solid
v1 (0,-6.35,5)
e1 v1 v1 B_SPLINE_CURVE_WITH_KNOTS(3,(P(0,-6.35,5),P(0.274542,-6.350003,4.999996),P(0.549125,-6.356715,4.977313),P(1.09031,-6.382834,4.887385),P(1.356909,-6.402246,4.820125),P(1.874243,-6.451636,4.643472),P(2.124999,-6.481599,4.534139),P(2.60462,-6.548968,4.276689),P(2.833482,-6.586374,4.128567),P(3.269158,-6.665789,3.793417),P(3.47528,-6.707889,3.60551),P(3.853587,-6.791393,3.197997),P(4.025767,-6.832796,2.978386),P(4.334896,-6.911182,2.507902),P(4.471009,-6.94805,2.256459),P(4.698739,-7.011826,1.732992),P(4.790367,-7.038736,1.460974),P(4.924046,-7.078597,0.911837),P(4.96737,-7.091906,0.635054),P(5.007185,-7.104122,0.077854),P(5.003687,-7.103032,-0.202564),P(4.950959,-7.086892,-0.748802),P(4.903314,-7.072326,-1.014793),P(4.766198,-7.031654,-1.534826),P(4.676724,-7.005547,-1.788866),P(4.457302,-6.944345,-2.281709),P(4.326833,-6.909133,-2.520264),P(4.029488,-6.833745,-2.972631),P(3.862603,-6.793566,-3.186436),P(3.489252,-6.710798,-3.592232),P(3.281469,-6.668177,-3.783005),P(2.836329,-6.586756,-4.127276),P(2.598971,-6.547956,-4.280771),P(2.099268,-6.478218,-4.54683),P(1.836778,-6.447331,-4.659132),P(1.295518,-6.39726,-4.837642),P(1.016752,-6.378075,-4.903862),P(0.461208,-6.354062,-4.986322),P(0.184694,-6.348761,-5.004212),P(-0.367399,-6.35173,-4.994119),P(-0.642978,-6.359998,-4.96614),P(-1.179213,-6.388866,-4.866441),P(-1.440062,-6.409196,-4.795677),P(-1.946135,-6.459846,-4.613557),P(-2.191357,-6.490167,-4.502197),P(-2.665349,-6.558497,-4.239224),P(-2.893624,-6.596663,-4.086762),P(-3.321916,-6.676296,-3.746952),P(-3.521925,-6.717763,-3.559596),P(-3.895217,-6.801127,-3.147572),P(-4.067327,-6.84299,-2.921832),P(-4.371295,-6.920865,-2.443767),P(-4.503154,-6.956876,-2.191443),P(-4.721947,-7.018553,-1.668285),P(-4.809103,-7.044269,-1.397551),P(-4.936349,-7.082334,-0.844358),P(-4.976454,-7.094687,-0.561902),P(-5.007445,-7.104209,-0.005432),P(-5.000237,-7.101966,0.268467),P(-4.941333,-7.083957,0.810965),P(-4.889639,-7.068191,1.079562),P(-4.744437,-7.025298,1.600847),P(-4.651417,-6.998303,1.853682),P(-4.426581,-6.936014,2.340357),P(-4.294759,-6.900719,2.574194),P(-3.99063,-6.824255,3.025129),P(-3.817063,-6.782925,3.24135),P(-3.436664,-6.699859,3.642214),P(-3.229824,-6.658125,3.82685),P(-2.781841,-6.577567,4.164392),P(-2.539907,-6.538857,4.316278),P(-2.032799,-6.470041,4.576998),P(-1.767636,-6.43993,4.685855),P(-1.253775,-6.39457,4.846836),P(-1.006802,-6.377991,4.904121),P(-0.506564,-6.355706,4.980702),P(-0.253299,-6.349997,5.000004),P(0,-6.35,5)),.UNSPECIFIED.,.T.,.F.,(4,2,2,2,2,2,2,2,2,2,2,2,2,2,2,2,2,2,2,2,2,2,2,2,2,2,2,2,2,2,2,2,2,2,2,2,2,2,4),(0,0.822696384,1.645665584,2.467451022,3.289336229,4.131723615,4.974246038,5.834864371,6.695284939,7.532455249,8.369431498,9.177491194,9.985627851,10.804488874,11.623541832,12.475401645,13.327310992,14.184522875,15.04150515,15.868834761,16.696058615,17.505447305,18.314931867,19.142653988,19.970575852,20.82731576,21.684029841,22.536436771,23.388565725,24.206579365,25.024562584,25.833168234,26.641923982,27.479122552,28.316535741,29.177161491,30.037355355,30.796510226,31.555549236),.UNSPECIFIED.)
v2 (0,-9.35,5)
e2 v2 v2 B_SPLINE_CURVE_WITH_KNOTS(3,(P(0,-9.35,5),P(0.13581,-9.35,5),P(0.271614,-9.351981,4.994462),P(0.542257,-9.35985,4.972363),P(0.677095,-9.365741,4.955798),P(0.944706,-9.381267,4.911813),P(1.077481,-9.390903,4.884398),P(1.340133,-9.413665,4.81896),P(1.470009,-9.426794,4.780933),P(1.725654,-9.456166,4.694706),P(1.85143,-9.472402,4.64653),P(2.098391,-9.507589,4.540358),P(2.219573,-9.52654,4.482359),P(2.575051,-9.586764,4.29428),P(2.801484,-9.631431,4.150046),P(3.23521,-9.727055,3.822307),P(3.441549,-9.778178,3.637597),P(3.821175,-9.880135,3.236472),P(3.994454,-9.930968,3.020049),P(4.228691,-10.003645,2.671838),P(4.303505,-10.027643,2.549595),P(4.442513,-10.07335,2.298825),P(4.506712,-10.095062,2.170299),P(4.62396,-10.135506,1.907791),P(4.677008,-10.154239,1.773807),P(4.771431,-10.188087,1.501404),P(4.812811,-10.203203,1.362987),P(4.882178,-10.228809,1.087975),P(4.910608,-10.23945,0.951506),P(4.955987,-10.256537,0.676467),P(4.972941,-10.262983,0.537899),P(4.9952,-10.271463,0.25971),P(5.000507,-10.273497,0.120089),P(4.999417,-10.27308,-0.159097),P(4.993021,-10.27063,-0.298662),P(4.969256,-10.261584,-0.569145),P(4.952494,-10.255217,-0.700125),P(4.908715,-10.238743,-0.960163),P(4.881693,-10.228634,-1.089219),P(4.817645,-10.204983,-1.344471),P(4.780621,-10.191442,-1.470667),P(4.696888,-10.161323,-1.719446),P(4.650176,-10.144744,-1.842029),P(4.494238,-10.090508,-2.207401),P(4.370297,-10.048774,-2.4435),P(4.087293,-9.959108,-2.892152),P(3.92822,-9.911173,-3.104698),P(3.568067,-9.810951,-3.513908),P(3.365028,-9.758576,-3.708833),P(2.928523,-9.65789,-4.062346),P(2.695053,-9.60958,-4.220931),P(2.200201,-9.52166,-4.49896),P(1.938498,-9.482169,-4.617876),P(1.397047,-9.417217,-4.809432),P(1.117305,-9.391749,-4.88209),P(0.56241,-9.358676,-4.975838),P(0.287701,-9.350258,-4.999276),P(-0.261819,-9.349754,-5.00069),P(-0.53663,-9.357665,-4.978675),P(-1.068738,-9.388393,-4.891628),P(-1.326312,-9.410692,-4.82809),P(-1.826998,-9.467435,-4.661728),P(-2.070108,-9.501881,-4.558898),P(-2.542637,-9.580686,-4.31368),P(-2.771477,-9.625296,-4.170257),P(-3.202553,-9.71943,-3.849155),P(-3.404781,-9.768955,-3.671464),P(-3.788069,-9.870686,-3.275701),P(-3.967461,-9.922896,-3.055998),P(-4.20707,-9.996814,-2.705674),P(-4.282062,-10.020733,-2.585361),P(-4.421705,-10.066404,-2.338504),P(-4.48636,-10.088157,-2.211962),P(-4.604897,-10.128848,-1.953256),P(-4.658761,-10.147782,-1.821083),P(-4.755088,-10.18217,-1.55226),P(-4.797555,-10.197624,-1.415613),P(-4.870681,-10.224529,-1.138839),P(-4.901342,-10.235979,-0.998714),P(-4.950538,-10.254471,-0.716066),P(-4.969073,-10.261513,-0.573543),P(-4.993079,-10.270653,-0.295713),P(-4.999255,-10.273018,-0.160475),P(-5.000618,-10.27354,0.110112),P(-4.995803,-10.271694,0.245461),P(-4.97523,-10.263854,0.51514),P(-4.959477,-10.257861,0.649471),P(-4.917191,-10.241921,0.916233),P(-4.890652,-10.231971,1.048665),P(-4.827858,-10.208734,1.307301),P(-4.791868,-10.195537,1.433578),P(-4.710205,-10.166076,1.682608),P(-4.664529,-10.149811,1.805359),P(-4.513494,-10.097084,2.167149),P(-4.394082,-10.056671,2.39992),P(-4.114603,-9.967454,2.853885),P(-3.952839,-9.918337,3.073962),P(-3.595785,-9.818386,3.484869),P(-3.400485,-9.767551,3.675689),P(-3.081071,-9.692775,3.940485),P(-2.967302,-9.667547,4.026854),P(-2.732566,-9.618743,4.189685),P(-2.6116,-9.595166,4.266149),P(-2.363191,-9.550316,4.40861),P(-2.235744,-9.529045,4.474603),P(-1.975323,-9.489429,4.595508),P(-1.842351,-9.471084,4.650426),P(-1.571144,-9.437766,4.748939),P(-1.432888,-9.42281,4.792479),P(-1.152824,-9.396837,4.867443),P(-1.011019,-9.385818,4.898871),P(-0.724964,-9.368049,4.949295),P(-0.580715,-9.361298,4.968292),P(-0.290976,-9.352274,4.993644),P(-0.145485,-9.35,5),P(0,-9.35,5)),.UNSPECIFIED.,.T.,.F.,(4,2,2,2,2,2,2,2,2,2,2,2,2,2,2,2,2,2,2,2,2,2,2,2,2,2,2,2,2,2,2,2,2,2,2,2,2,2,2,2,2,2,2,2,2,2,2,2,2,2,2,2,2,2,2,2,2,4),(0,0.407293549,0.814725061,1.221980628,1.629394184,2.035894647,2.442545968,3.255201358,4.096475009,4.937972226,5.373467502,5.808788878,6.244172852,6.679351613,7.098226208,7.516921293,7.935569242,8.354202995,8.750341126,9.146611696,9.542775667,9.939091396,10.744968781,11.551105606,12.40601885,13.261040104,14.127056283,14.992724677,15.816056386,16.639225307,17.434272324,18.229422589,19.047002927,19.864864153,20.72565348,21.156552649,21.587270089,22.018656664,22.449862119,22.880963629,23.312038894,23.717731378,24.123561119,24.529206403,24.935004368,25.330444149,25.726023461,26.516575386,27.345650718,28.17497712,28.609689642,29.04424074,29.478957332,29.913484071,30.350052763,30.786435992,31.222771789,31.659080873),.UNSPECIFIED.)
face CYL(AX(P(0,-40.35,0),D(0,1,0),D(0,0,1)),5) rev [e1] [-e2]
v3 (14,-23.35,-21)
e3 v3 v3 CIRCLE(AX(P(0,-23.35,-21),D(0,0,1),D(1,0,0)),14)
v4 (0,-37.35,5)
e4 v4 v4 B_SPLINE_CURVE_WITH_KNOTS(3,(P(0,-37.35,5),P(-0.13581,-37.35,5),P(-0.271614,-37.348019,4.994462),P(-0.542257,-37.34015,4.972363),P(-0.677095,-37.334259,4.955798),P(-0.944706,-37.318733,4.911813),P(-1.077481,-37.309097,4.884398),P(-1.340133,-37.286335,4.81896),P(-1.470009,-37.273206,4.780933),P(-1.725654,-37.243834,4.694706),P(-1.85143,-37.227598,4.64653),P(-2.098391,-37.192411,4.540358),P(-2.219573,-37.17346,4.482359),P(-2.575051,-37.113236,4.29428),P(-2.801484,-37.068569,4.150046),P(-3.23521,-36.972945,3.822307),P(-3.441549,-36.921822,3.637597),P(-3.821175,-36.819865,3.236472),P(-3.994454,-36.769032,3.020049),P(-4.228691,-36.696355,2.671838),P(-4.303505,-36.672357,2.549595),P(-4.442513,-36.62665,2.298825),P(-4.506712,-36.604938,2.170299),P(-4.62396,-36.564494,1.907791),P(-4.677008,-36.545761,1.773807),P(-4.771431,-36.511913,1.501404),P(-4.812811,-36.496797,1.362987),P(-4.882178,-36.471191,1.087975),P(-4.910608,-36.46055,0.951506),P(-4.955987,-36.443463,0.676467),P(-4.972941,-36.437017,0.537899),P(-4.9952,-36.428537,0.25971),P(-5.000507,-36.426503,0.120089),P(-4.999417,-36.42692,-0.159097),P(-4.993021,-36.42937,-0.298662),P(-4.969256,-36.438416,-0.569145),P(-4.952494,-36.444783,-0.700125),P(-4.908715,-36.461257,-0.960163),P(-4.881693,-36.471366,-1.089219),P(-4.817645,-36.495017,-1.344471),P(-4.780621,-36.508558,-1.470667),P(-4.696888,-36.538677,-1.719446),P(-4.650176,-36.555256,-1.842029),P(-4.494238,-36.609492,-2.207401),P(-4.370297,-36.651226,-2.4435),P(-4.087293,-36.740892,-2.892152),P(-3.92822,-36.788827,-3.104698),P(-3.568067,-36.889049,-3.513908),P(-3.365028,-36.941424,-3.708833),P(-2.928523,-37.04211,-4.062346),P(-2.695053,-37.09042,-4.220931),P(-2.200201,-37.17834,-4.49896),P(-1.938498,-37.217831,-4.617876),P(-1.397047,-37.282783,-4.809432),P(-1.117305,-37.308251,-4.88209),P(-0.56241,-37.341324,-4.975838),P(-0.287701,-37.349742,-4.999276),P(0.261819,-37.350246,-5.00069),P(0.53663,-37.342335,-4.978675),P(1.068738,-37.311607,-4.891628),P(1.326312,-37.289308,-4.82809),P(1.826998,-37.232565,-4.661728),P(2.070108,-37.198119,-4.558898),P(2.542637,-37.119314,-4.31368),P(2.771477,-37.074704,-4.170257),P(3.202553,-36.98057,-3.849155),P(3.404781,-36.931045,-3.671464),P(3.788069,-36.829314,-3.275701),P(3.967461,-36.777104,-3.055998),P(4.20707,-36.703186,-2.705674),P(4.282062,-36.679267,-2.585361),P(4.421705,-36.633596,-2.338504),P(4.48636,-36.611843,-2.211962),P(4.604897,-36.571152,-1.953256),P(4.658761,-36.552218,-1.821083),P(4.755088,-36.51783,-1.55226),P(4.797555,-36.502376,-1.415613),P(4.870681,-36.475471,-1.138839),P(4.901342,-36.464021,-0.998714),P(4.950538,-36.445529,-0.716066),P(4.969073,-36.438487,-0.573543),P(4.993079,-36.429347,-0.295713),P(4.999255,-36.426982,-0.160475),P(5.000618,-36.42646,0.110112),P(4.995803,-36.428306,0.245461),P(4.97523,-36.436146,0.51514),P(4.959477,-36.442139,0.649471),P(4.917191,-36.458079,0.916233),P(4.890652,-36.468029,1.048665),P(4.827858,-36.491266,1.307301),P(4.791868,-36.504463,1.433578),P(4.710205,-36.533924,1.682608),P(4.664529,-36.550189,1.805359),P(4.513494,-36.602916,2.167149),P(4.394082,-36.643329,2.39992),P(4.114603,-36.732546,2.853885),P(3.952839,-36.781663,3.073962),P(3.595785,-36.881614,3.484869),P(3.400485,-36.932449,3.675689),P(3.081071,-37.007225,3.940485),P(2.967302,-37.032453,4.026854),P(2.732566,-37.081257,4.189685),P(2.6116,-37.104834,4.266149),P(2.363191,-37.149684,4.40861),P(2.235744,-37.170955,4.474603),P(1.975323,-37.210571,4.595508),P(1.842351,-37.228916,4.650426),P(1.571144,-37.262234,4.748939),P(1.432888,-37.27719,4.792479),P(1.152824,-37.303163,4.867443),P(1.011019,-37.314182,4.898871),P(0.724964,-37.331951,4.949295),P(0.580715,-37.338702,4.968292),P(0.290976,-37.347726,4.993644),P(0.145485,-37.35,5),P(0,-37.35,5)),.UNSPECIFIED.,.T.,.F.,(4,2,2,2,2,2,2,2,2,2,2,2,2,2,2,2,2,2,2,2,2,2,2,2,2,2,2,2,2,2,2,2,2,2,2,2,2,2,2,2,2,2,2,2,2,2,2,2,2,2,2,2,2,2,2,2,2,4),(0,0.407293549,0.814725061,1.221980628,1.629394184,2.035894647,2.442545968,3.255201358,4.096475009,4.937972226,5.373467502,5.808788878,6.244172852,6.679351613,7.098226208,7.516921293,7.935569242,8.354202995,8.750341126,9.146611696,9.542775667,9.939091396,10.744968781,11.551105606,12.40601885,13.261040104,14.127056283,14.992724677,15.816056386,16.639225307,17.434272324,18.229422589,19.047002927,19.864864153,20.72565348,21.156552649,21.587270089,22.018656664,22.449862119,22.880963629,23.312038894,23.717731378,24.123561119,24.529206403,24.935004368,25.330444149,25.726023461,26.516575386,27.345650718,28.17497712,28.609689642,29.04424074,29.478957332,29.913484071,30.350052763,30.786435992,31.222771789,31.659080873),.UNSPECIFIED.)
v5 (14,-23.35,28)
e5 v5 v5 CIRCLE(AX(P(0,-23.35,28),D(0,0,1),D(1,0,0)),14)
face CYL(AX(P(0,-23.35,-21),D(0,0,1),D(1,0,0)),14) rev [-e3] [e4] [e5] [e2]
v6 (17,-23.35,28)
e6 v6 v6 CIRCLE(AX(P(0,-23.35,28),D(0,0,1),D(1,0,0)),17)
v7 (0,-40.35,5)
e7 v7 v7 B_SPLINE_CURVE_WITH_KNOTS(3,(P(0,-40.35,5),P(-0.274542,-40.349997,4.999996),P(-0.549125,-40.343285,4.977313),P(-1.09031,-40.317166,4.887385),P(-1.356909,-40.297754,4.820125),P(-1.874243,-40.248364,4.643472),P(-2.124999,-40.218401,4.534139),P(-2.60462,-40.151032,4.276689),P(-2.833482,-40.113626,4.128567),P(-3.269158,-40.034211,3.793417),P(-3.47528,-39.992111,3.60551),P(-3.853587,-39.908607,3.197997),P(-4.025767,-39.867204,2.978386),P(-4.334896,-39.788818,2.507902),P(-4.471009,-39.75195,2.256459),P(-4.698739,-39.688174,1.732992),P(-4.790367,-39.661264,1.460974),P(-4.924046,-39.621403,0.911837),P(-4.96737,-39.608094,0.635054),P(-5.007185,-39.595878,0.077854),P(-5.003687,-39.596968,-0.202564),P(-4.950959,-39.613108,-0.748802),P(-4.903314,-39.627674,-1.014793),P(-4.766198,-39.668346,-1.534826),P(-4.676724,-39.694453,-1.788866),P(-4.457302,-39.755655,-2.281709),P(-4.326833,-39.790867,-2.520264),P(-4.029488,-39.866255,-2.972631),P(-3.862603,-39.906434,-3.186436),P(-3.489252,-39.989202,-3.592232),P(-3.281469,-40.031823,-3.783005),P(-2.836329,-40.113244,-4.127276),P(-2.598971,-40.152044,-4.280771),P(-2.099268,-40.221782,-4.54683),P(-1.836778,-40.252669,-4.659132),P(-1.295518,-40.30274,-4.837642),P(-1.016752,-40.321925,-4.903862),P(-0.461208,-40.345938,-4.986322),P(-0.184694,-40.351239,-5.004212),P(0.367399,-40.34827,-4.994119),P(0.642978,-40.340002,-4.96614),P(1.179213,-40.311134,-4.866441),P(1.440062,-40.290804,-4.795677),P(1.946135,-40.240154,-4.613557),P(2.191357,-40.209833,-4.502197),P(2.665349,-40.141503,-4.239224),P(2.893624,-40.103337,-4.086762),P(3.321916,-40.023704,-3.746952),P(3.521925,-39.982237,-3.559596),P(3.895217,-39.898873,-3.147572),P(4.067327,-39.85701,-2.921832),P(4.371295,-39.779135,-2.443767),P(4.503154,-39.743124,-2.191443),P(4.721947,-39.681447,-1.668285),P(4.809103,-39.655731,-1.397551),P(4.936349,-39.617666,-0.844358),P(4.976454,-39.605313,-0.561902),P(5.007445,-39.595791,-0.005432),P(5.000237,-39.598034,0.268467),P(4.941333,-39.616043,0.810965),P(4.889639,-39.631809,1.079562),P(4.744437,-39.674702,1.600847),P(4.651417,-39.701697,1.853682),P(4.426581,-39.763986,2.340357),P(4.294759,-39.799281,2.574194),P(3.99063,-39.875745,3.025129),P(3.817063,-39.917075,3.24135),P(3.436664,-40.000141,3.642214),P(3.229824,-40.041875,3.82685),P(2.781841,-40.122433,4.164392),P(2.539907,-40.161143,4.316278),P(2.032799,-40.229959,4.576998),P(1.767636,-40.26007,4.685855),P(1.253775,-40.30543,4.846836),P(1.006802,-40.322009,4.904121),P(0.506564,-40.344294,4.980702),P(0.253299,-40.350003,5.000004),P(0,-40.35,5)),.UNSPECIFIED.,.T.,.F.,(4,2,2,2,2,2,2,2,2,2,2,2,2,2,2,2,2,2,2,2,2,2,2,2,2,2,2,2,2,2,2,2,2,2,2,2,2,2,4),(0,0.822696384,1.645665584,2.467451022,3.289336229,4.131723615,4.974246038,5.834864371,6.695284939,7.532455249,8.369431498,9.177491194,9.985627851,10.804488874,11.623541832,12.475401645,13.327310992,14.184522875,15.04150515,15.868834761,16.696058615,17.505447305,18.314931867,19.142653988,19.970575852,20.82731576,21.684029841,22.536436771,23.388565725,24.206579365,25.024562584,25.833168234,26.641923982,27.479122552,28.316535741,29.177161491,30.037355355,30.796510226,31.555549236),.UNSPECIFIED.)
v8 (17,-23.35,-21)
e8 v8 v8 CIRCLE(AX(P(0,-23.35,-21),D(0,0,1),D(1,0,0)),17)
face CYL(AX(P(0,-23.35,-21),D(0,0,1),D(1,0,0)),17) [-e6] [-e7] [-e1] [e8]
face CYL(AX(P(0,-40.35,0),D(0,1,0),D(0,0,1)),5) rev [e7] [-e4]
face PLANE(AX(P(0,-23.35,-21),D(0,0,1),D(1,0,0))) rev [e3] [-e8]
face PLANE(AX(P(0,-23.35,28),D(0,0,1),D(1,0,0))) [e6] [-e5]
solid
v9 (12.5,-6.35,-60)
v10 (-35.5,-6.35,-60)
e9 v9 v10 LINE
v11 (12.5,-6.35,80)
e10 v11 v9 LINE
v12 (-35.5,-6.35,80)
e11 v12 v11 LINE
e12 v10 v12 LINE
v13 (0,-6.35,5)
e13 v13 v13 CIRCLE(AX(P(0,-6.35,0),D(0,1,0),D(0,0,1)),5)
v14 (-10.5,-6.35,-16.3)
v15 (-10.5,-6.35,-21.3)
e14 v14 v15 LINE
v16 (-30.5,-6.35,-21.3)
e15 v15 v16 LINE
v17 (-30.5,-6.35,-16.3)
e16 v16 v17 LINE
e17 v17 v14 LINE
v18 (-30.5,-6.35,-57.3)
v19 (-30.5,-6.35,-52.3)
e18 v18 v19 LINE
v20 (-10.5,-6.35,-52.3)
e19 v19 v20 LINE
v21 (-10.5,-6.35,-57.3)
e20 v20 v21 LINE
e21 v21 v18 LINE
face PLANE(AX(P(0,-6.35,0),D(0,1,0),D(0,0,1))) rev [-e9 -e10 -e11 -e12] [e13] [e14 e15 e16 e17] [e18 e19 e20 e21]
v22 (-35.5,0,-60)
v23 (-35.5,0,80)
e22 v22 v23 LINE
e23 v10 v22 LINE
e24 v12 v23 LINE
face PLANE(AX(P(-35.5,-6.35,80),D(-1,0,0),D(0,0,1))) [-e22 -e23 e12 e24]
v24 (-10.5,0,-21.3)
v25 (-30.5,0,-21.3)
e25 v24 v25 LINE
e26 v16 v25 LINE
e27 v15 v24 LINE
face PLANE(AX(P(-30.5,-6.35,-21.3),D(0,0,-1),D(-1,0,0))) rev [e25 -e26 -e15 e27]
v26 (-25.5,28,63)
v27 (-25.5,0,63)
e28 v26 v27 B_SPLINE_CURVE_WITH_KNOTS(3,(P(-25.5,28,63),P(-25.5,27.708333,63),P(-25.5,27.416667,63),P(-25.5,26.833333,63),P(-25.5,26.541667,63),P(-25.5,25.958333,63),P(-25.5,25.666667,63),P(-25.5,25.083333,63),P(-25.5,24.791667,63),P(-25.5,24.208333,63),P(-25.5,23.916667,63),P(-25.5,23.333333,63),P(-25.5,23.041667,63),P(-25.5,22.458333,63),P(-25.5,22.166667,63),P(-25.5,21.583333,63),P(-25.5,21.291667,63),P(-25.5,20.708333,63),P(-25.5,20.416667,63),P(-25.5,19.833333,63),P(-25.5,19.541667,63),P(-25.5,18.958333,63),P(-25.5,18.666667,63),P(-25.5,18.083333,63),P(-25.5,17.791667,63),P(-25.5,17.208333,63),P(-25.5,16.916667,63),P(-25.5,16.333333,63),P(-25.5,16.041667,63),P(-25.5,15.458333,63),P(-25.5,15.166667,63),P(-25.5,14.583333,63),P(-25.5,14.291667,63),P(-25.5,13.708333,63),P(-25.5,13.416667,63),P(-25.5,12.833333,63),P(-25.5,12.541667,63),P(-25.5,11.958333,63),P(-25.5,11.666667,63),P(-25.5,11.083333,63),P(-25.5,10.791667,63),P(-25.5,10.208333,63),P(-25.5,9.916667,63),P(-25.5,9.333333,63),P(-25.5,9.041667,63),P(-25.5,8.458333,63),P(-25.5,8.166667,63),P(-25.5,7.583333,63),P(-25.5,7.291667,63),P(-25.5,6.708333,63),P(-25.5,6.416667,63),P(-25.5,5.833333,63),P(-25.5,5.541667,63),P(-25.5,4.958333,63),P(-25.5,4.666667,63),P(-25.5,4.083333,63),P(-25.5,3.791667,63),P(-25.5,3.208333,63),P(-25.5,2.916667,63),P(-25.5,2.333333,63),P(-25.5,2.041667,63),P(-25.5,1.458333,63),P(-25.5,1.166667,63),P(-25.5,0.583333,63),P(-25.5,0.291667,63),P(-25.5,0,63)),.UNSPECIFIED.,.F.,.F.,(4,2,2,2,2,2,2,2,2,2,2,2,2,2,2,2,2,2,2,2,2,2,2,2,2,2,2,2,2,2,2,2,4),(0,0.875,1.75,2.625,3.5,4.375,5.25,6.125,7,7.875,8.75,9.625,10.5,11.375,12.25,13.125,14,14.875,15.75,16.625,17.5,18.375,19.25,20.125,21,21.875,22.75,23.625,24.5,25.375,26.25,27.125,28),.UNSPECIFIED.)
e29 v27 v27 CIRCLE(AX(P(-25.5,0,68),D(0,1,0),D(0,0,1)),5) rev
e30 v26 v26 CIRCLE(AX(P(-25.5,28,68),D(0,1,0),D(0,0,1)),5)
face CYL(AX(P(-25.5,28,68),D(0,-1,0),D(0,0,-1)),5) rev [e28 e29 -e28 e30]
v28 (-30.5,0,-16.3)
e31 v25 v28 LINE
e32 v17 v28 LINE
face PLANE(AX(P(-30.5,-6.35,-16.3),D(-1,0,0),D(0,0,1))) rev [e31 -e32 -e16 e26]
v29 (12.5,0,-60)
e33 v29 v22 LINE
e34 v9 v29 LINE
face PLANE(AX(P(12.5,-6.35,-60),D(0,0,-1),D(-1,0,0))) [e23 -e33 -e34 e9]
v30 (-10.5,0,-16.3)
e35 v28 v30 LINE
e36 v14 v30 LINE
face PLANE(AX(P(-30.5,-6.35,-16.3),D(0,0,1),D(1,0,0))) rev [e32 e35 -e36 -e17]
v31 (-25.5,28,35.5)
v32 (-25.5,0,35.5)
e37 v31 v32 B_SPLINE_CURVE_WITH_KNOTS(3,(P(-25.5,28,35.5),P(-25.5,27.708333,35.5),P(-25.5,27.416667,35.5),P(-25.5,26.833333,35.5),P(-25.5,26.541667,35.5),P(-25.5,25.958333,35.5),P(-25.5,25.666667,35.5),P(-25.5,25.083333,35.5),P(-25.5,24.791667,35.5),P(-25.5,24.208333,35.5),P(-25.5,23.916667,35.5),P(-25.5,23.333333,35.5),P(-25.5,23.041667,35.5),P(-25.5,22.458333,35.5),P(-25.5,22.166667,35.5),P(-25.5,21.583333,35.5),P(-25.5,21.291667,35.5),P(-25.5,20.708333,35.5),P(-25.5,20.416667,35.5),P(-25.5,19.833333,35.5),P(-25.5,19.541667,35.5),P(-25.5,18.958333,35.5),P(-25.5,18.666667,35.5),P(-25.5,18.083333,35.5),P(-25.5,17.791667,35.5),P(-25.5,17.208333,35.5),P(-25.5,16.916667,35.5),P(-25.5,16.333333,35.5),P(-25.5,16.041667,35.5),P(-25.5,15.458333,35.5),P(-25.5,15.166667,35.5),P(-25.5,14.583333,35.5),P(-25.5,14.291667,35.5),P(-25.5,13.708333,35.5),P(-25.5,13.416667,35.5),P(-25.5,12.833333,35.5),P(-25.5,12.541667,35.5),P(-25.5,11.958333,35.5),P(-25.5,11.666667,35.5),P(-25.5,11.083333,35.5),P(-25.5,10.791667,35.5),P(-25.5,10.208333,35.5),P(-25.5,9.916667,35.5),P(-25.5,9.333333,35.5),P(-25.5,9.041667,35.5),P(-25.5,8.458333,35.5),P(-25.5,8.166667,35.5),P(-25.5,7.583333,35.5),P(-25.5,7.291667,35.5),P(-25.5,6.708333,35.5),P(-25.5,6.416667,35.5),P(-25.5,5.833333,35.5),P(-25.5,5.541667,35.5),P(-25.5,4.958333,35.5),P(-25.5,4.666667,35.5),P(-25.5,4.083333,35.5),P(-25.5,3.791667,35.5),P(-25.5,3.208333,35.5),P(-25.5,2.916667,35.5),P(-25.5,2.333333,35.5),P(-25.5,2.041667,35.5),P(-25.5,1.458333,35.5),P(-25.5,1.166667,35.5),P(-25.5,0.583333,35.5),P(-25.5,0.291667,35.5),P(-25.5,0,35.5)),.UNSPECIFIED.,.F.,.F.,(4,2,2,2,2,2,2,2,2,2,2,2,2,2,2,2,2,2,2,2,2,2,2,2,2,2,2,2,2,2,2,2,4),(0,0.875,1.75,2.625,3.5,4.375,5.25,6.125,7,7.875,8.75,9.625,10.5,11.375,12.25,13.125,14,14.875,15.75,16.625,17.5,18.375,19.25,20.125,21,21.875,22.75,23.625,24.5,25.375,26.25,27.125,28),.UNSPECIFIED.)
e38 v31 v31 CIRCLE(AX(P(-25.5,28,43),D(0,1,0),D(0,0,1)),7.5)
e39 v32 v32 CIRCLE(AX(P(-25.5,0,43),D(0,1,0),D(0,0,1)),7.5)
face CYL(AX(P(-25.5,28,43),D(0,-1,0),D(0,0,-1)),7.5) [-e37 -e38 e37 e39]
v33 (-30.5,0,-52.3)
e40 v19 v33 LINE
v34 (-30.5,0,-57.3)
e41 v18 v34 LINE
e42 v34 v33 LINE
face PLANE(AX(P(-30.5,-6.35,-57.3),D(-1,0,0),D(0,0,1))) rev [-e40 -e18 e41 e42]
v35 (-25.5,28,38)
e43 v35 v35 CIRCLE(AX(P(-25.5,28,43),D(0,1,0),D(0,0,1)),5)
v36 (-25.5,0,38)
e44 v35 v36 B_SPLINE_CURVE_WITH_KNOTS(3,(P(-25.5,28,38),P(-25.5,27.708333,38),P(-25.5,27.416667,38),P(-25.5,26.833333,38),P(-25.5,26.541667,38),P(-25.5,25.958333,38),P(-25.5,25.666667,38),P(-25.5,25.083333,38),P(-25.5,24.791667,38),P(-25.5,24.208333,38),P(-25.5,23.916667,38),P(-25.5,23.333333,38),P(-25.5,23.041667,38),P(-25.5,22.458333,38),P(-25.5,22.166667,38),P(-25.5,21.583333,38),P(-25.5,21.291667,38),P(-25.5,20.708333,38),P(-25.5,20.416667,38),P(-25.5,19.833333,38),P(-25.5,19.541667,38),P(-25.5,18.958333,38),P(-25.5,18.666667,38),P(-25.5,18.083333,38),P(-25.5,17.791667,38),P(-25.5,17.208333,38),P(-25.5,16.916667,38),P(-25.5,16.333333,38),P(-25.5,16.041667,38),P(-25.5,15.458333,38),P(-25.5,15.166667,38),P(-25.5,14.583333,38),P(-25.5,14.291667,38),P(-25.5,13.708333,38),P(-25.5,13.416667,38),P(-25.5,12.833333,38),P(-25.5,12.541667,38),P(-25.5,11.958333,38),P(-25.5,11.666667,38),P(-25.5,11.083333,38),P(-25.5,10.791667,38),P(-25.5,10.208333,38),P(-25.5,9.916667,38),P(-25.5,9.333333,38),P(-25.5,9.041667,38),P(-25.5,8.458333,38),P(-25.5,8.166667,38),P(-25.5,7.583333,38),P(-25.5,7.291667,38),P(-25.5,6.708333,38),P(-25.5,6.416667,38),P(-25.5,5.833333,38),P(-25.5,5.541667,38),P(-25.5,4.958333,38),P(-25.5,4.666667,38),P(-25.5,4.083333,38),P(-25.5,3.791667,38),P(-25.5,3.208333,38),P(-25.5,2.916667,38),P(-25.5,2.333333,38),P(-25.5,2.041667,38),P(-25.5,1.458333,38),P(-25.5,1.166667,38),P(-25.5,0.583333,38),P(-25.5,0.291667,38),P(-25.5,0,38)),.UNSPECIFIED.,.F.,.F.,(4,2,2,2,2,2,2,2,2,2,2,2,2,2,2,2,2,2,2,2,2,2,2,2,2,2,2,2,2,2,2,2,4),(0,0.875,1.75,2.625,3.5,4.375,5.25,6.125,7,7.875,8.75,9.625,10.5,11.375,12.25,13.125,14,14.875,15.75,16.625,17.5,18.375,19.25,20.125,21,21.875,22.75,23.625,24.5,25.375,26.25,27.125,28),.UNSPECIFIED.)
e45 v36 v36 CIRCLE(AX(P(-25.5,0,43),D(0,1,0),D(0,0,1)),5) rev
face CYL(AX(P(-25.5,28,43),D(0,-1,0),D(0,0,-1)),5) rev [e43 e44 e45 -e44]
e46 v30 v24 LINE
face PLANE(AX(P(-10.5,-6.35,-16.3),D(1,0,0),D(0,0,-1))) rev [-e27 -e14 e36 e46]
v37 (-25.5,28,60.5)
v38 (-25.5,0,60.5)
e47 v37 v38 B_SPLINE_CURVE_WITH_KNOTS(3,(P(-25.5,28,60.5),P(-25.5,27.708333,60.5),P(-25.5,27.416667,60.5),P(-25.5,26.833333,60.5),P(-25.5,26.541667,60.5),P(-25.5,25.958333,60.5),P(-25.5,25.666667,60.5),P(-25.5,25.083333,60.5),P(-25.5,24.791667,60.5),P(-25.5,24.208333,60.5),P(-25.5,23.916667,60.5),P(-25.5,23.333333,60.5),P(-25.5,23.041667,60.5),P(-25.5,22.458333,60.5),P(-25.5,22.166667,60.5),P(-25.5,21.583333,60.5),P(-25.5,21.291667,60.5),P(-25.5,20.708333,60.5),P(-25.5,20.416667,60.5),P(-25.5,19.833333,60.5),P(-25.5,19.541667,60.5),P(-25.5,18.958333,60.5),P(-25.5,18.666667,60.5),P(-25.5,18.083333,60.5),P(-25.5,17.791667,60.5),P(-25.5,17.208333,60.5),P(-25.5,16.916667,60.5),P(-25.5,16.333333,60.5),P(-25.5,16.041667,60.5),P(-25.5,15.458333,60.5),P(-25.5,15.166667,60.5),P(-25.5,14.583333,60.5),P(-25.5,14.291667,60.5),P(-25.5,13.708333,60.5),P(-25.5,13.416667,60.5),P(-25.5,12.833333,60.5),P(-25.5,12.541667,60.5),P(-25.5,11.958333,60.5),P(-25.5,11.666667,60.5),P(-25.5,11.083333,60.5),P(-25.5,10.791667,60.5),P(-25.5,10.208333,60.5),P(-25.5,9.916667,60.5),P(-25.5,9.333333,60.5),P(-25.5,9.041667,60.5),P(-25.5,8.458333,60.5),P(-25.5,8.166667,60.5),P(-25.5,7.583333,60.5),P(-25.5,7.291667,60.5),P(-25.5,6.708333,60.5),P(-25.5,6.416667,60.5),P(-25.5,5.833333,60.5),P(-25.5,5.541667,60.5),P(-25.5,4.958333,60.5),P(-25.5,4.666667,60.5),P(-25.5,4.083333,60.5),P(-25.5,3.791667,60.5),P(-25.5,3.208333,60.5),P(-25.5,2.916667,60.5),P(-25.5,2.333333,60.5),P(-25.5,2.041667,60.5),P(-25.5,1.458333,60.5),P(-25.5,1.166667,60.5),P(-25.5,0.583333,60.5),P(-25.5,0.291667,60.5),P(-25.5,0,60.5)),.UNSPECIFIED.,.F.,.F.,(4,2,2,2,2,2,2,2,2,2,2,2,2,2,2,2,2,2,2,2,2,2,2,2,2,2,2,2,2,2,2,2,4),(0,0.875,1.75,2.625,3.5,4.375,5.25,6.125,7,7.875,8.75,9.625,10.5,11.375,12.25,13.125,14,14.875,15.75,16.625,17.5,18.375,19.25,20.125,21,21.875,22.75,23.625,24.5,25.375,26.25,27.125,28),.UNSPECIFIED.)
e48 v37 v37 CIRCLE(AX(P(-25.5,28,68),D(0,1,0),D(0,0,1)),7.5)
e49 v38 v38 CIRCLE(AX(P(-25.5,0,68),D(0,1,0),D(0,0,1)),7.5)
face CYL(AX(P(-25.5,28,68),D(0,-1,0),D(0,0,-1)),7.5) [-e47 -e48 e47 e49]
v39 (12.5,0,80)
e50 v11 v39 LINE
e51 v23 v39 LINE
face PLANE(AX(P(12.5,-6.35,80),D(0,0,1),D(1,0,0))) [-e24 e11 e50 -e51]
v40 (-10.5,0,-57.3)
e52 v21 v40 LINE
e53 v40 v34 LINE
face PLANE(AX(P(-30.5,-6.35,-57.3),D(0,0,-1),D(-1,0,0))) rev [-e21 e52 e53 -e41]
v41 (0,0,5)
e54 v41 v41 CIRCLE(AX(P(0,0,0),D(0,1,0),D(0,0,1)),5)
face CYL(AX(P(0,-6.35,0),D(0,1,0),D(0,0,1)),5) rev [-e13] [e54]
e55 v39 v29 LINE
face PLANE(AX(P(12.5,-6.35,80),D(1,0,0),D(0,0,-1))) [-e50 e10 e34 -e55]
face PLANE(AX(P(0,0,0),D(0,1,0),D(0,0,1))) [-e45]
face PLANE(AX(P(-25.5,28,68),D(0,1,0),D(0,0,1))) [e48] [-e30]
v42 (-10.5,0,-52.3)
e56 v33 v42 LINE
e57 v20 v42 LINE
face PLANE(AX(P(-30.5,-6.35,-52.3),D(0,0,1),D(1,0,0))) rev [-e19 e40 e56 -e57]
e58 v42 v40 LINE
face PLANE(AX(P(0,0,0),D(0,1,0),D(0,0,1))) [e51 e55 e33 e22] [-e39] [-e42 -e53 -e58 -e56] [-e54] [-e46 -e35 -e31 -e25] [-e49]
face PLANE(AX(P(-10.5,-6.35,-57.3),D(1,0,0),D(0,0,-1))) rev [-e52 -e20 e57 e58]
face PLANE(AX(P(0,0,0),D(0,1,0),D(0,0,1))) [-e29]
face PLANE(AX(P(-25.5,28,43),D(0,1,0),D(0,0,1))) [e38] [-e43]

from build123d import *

# Parameters (mm, degrees)
SKETCH1_W                = 48
SKETCH1_H                = 140
SKETCH1_R                = 5
SKETCH1_W_2              = 20
SKETCH1_H_2              = 5
BASE_FLANGE1_DEPTH       = 6.35
SKETCH6_R                = 7.5
SKETCH6_R_2              = 5
BOSS_EXTRUDE1_DEPTH      = 28
BOSS_EXTRUDE2_DEPTH      = 28
BOSS_EXTRUDE2_DEPTH_BACK = 21
SKETCH7_R                = 17
SKETCH7_R_2              = 14
SKETCH8_R                = 5
CUT_EXTRUDE1_DEPTH       = 97.376202976


# Sheet-metal steps are written as plain solids
with BuildPart() as part:
    # Sketch1 → Base-Flange1 (new body)
    with BuildSketch(Plane(origin=(0, 0, 0), x_dir=(1, 0, 0), z_dir=(0, 1, 0))):
        with Locations((-11.5, -10)):
            Rectangle(SKETCH1_W, SKETCH1_H)
        with Locations(Location((0, 0, 0), (0, 0, 270))):
            Circle(SKETCH1_R, mode=Mode.SUBTRACT)
        with Locations((-20.5, 54.8)):
            Rectangle(SKETCH1_W_2, SKETCH1_H_2, mode=Mode.SUBTRACT)
        with Locations((-20.5, 18.8)):
            Rectangle(SKETCH1_W_2, SKETCH1_H_2, mode=Mode.SUBTRACT)
    extrude(amount=-BASE_FLANGE1_DEPTH)

    # Sketch6 → Boss-Extrude1 (add)
    # profile 1 of 2: a face of its own
    with BuildSketch(Plane(origin=(0, 0, 0), x_dir=(1, 0, 0), z_dir=(0, 1, 0))):
        with Locations(Location((-25.5, -68, 0), (0, 0, 90))):
            Circle(SKETCH6_R)
        with Locations(Location((-25.5, -68, 0), (0, 0, 90))):
            Circle(SKETCH6_R_2, mode=Mode.SUBTRACT)
    # profile 2 of 2: a face of its own
    with BuildSketch(Plane(origin=(0, 0, 0), x_dir=(1, 0, 0), z_dir=(0, 1, 0))):
        with Locations(Location((-25.5, -43, 0), (0, 0, 90))):
            Circle(SKETCH6_R)
        with Locations(Location((-25.5, -43, 0), (0, 0, 90))):
            Circle(SKETCH6_R_2, mode=Mode.SUBTRACT)
    extrude(amount=BOSS_EXTRUDE1_DEPTH)


with BuildPart() as body_2:
    # Sketch7 → Boss-Extrude2 (new, two sides: drawn at the far end of the back side and taken through both)
    with BuildSketch(Plane.XY.offset(-BOSS_EXTRUDE2_DEPTH_BACK)):
        with Locations((0, -23.35)):
            Circle(SKETCH7_R)
        with Locations((0, -23.35)):
            Circle(SKETCH7_R_2, mode=Mode.SUBTRACT)
    extrude(amount=BOSS_EXTRUDE2_DEPTH + BOSS_EXTRUDE2_DEPTH_BACK)

    # Sketch8 → Cut-Extrude1 (cut, through all)
    with BuildSketch(Plane(origin=(0, 0, 0), x_dir=(1, 0, 0), z_dir=(0, 1, 0))):
        with Locations(Location((0, 0, 0), (0, 0, 270))):
            Circle(SKETCH8_R)
    extrude(amount=-CUT_EXTRUDE1_DEPTH, mode=Mode.SUBTRACT)


solid = Compound([part.part, body_2.part])
